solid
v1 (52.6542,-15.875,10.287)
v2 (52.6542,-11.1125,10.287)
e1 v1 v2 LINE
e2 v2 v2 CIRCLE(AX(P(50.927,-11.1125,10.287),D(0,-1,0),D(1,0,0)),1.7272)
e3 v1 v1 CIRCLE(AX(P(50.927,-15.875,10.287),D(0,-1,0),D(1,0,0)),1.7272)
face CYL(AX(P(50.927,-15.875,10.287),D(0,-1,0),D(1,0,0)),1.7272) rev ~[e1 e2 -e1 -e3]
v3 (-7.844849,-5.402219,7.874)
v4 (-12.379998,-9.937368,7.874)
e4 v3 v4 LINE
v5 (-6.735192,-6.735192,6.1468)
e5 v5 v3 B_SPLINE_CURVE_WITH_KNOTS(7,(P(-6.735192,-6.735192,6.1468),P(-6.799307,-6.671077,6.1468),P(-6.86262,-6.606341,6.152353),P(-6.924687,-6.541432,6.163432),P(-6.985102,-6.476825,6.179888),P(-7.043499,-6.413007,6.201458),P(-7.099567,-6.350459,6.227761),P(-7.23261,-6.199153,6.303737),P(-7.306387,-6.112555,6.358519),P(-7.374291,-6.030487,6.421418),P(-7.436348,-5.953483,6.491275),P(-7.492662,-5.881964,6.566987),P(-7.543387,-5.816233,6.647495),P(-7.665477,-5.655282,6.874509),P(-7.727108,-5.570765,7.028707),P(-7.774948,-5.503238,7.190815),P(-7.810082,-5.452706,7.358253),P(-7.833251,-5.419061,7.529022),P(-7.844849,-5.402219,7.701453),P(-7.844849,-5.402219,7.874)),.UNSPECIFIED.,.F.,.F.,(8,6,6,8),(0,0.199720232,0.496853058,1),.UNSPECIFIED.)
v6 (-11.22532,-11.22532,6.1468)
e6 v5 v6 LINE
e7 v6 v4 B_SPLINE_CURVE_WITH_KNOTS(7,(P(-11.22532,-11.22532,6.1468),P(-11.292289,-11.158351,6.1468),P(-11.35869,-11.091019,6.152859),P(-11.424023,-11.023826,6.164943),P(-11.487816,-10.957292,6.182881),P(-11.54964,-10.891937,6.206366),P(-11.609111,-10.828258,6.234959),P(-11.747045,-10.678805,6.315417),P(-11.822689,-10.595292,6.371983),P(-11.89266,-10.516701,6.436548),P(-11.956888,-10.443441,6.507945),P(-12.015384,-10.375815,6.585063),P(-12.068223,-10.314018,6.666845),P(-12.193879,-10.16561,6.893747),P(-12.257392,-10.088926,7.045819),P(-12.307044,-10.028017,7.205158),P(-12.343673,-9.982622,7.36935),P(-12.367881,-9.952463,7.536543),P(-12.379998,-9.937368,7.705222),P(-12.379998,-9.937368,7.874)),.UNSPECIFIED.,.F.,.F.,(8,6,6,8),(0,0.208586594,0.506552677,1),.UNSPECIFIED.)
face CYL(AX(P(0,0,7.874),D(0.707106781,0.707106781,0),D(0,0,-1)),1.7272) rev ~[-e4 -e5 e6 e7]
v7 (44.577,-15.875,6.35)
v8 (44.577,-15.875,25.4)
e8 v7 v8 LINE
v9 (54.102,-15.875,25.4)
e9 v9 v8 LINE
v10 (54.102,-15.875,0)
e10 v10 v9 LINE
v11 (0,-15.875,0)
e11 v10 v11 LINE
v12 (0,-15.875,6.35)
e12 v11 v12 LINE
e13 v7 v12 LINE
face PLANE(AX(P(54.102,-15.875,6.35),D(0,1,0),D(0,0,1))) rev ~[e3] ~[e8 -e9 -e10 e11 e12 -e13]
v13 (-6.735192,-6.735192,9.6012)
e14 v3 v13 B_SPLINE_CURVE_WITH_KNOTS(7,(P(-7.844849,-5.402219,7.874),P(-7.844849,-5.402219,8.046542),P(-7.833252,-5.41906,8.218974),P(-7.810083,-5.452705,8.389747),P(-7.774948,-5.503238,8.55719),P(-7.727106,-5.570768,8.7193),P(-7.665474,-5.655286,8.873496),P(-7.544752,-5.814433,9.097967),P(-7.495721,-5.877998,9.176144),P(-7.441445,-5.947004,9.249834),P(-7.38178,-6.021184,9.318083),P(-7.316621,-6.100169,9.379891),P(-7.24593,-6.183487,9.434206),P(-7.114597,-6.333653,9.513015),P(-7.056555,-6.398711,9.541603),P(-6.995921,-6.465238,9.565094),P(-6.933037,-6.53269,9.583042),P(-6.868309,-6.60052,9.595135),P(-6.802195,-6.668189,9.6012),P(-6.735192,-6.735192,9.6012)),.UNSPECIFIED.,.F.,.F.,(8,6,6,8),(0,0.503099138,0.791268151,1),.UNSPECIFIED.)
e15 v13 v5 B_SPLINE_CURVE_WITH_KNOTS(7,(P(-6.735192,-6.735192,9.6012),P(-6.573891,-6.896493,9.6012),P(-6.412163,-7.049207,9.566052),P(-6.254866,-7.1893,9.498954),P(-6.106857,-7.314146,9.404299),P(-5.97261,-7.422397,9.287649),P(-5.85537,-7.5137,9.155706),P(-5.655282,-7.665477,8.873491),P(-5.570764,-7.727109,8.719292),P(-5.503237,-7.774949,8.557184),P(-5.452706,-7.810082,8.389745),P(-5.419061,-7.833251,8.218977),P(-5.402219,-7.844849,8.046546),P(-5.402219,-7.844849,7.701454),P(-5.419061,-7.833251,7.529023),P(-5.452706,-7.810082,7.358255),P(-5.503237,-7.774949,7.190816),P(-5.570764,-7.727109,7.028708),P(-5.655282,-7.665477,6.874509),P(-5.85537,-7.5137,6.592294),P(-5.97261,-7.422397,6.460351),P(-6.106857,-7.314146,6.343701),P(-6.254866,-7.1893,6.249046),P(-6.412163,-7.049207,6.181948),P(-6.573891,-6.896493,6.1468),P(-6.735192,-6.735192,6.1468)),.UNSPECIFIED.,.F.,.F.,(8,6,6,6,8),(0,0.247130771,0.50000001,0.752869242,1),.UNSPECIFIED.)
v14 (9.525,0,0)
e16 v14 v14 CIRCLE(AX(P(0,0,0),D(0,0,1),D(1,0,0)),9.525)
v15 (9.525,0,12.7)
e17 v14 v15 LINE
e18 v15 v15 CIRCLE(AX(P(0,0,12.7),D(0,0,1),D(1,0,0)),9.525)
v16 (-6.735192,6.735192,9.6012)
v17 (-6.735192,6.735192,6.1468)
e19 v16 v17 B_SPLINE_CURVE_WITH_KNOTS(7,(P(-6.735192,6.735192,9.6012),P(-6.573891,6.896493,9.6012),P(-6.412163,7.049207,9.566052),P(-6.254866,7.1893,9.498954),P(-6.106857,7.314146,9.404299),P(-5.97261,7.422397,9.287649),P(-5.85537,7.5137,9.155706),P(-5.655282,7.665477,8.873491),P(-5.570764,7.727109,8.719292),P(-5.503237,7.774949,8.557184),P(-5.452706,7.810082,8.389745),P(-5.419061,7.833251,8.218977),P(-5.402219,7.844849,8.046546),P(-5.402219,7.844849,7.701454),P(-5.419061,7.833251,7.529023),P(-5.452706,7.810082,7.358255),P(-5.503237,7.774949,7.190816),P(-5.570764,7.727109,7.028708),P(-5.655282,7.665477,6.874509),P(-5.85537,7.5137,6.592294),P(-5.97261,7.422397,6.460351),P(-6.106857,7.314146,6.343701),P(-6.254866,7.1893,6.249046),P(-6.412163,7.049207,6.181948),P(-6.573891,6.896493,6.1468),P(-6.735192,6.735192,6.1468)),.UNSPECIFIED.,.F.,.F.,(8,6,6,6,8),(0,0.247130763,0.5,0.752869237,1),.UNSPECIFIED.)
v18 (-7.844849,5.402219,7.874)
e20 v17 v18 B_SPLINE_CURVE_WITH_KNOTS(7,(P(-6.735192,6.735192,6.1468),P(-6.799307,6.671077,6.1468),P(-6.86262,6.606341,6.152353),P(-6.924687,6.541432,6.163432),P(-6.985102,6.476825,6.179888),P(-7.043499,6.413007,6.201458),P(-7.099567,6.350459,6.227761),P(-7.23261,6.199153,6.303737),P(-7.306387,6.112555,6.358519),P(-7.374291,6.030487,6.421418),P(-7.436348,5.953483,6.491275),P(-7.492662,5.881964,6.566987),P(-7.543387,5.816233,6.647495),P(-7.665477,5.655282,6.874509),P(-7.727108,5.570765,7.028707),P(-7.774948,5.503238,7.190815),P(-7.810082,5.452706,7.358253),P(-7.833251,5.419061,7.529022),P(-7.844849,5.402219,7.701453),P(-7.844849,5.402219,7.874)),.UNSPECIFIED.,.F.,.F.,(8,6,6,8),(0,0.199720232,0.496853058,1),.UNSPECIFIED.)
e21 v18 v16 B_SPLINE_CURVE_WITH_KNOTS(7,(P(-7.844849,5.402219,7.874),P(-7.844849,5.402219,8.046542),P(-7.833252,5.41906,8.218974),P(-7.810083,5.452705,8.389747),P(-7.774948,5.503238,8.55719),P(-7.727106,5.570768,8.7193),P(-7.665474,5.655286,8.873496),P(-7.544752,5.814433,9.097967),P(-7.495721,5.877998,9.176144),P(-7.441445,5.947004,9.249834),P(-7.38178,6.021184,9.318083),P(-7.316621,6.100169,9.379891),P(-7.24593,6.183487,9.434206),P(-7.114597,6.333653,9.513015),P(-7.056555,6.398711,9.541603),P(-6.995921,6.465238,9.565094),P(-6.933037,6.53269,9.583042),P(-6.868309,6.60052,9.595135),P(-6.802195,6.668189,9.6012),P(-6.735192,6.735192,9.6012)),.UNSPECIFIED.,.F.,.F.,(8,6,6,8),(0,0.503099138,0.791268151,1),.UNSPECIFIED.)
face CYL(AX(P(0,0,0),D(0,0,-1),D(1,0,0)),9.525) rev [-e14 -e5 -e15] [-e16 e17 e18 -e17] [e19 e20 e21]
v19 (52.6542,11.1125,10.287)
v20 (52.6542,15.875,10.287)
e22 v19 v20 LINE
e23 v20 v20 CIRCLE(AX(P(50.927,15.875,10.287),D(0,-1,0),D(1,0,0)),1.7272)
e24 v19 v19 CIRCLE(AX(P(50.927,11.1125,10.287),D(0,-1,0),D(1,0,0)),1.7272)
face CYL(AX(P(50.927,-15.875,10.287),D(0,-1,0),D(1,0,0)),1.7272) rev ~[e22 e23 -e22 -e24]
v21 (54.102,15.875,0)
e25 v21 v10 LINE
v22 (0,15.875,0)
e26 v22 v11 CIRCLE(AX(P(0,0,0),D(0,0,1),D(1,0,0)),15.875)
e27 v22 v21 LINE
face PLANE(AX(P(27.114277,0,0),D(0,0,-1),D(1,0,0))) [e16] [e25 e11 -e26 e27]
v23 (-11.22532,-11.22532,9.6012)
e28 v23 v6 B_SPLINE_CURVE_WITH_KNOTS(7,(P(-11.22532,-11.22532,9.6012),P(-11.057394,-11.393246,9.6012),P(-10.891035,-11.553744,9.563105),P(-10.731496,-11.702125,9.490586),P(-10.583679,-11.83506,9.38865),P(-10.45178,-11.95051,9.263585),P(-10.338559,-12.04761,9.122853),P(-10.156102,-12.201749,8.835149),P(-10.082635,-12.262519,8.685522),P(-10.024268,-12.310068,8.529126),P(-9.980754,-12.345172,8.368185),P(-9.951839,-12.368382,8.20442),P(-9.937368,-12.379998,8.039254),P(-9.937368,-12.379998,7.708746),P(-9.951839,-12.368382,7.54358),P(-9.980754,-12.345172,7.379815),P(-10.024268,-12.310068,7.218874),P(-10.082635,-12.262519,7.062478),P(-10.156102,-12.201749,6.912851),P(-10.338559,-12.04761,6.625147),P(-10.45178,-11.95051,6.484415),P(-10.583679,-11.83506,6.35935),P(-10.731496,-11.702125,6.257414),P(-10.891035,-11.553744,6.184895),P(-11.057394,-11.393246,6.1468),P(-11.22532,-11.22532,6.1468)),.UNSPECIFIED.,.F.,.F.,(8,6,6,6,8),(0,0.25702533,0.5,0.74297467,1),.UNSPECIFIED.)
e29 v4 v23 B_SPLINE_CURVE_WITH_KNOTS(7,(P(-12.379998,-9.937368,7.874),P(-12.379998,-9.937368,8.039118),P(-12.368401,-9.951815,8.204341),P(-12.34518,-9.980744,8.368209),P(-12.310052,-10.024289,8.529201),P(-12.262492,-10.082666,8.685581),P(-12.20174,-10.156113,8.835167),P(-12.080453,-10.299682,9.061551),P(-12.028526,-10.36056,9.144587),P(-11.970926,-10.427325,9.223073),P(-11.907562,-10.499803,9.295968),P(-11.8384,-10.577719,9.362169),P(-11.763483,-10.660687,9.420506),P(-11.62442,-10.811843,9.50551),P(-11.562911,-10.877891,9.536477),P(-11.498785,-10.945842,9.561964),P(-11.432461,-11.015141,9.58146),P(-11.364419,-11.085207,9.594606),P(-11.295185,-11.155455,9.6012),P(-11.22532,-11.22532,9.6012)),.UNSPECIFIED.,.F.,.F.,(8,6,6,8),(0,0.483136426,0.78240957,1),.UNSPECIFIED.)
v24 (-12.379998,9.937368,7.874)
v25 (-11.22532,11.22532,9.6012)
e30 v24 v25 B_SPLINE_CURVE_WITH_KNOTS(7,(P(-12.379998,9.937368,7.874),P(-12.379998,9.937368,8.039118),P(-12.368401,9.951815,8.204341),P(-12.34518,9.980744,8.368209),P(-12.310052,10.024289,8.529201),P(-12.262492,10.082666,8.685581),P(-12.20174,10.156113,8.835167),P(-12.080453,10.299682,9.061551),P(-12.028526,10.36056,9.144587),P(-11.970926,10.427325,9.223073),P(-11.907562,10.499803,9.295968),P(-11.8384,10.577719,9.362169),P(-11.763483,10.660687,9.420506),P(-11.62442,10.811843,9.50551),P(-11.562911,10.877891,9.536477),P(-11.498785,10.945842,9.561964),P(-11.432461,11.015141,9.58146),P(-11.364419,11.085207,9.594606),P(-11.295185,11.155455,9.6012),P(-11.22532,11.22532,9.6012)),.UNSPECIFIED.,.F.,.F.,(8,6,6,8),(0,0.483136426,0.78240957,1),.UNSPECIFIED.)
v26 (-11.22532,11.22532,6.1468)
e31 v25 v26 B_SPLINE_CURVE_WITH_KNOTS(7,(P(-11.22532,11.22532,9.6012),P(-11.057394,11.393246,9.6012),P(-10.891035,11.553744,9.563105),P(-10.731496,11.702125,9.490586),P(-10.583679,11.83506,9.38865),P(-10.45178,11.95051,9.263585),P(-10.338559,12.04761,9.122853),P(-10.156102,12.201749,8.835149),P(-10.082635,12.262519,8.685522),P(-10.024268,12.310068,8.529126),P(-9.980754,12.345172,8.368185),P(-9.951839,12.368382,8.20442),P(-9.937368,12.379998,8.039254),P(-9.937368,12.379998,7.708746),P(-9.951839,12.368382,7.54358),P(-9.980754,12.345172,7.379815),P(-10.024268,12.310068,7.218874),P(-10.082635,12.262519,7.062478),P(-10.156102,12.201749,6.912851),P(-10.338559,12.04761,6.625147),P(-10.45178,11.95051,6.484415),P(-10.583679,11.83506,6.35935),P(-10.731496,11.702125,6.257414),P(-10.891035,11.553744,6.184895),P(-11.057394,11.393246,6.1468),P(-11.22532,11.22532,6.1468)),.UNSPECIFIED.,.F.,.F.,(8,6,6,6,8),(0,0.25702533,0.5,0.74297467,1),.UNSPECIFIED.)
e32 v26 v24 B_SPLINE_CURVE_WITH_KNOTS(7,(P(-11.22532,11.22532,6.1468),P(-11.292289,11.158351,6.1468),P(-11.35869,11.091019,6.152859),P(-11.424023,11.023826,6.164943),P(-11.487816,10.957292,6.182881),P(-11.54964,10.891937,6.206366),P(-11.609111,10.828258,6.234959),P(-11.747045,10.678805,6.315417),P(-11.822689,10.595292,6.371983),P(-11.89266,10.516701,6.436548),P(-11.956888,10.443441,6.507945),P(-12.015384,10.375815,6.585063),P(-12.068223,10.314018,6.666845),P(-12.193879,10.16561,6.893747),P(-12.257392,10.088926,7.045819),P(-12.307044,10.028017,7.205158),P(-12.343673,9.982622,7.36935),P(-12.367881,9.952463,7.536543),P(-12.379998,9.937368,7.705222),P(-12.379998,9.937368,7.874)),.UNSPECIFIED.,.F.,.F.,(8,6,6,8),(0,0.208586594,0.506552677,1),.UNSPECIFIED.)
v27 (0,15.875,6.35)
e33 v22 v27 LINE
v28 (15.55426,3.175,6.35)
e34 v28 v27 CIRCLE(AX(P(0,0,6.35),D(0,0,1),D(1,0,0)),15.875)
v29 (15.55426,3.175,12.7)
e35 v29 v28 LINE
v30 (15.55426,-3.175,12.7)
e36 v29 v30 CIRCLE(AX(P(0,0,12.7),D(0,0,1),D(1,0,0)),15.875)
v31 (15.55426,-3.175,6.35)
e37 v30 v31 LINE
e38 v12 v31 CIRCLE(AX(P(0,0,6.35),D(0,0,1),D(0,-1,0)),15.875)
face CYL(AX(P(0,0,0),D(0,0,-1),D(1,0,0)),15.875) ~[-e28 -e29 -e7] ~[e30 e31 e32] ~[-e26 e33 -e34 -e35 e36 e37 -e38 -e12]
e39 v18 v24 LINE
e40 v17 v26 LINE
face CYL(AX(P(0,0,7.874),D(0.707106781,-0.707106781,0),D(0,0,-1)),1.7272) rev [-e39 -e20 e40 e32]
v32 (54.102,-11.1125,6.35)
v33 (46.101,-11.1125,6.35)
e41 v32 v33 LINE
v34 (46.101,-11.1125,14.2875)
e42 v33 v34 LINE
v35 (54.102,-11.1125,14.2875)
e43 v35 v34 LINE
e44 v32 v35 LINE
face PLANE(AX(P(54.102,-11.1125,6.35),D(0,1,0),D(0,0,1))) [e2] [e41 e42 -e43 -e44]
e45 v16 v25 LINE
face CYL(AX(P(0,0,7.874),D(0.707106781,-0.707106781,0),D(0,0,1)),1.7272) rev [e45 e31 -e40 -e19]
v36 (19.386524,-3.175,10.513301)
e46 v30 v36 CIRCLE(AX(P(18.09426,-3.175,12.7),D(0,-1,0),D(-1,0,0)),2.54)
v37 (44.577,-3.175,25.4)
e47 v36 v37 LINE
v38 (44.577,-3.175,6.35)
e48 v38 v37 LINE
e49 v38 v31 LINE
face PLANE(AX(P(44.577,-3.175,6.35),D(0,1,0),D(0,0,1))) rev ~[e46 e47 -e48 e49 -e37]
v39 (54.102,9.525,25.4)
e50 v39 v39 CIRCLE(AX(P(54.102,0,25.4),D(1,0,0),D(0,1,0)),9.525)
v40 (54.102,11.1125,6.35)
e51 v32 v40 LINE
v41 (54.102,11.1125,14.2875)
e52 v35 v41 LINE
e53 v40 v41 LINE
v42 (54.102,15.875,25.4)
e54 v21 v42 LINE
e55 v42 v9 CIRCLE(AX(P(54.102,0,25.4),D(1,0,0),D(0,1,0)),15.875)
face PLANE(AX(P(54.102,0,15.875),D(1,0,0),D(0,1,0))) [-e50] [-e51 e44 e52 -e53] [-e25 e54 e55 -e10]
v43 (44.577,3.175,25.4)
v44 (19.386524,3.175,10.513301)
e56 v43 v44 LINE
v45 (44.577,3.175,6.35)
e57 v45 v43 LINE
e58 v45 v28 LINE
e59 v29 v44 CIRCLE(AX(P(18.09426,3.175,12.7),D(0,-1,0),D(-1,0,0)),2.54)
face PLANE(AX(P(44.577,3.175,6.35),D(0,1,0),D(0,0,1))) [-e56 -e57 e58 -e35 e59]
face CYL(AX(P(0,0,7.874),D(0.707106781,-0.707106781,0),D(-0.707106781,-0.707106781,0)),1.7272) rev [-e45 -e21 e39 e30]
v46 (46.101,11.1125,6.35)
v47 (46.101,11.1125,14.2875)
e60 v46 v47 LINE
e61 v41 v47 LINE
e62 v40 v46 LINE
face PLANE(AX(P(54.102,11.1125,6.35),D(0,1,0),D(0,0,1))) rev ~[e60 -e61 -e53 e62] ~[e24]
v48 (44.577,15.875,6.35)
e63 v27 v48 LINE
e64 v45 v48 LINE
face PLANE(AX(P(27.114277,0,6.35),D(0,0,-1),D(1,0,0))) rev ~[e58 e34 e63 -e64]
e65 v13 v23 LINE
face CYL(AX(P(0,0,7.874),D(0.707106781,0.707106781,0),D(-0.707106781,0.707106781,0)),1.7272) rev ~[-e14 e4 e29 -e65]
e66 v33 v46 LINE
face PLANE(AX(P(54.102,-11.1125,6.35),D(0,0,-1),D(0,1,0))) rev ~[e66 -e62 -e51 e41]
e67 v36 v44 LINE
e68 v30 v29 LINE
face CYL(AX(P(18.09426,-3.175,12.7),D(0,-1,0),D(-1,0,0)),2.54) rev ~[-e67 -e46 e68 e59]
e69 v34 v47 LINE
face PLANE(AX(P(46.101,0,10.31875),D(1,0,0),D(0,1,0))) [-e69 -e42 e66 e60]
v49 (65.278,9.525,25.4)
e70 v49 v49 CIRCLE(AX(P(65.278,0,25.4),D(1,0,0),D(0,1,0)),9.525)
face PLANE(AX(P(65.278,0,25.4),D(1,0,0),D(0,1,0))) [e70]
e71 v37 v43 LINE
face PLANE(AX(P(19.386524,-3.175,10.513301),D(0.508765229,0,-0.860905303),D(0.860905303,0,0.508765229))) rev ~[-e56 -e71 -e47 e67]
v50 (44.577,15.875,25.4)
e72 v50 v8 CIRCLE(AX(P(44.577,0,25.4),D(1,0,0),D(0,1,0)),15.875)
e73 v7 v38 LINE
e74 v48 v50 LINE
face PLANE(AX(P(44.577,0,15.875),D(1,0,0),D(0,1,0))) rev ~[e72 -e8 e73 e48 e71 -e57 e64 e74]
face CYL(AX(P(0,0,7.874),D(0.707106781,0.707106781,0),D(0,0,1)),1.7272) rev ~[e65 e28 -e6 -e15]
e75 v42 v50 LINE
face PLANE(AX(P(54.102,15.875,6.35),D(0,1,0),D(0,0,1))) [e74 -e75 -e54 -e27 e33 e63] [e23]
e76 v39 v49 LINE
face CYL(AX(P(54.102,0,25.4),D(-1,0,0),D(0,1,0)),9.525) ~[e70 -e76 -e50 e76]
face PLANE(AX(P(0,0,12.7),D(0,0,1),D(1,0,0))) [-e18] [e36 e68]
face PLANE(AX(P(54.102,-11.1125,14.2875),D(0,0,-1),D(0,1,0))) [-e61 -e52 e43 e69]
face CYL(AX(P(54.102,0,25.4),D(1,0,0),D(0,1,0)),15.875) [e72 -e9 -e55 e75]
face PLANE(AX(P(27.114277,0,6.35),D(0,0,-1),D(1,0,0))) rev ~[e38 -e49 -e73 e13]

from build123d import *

# Parameters (mm, degrees)
F0_R           = 15.875
F0_R_2         = 9.525
F1_DEPTH       = 12.7
F5_DEPTH       = 25.4
F7_DEPTH       = 25.4
F9_DEPTH       = 6.35
F11_W          = 31.75
F11_H          = 19.05
F12_DEPTH      = 9.525
F14_END_RADIUS = 15.875
F13_W          = 3.175
F13_H          = 19.05
F14_REACH      = 79.7657711337
F16_DEPTH      = 25.4
F17_R          = 9.525
F18_DEPTH      = 11.176
F19_W          = 22.225
F19_H          = 7.9375
F20_DEPTH      = 8.001
F21_R          = 1.7272
F22_DEPTH      = 101.6


with BuildPart() as f1:
    # F0 (on Top) → F1 (new body)
    with BuildSketch(Plane.XY):
        Circle(F0_R)
        Circle(F0_R_2, mode=Mode.SUBTRACT)
    extrude(amount=F1_DEPTH)

    # F4 (on face) → F5 (cut)
    with BuildSketch(Plane(origin=(0, 0, 0), x_dir=(-0.7071067812, 0.7071067812, 0), z_dir=(0.7071067812, 0.7071067812, 0))):
        with BuildLine():
            ThreePointArc((0, 6.1468), (1.2213148325, 6.6526851675), (1.7272, 7.874))
            ThreePointArc((1.7272, 7.874), (1.2213148325, 9.0953148325), (0, 9.6012))
            Line((0, 9.6012), (0, 6.1468))
        make_face()
        with BuildLine():
            Line((0, 6.1468), (0, 9.6012))
            ThreePointArc((0, 9.6012), (-1.7272, 7.874), (0, 6.1468))
        make_face()
    extrude(amount=-F5_DEPTH, mode=Mode.SUBTRACT)

    # F6 (on face) → F7 (cut)
    with BuildSketch(Plane(origin=(0, 0, 0), x_dir=(-0.7071067812, -0.7071067812, 0), z_dir=(-0.7071067812, 0.7071067812, 0))):
        with BuildLine():
            ThreePointArc((0, 6.1468), (1.2213148325, 6.6526851675), (1.7272, 7.874))
            ThreePointArc((1.7272, 7.874), (1.2213148325, 9.0953148325), (0, 9.6012))
            Line((0, 9.6012), (0, 6.1468))
        make_face()
        with BuildLine():
            Line((0, 6.1468), (0, 9.6012))
            ThreePointArc((0, 9.6012), (-1.7272, 7.874), (0, 6.1468))
        make_face()
    extrude(amount=F7_DEPTH, mode=Mode.SUBTRACT)

    # F8 (on face) → F9 (join)
    with BuildSketch(Plane(origin=(0, 0, 0), x_dir=(1, 0, 0), z_dir=(0, 0, -1))):
        with BuildLine():
            Line((54.102, 15.875), (0, 15.875))
            ThreePointArc((0, 15.875), (11.2253201513, 11.2253201513), (15.875, 0))
            ThreePointArc((15.875, 0), (11.2253201513, -11.2253201513), (0, -15.875))
            Line((0, -15.875), (54.102, -15.875))
            Line((54.102, -15.875), (54.102, 15.875))
        make_face()
    extrude(amount=-F9_DEPTH)

    # F11 (on offset) → F12 (join)
    with BuildSketch(Plane.YZ.offset(54.102)):
        with Locations((0, 15.875)):
            Rectangle(F11_W, F11_H)
        with BuildLine():
            ThreePointArc((15.875, 25.4), (0, 41.275), (-15.875, 25.4))
            Line((-15.875, 25.4), (15.875, 25.4))
        make_face()
    extrude(amount=-F12_DEPTH)

    f14_end = (Plane(origin=(0, 0, 6.35), x_dir=(-1, 0, 0), z_dir=(0, 0, -1)) * Cylinder(F14_END_RADIUS, 333.9846154871, mode=Mode.PRIVATE)).faces().sort_by_distance((-15.875, 0, 6.35))[0]
    # F13 (on face) → F14 (join, up to the whole of a round face its end follows)
    with BuildSketch(Plane(origin=(44.577, 0, 0), x_dir=(0, -1, 0), z_dir=(-1, 0, 0))):
        with Locations((-1.5875, 15.875)):
            Rectangle(F13_W, F13_H)
        with Locations((1.5875, 15.875)):
            Rectangle(F13_W, F13_H)
    f14_long = extrude(amount=F14_REACH, mode=Mode.PRIVATE)
    add(split(f14_long, bisect_by=f14_end, keep=Keep.ALL, mode=Mode.PRIVATE).solids().sort_by_distance((44.577, 0, 15.875))[0])

    # F15 (on face) → F16 (cut)
    with BuildSketch(Plane.XZ.offset(3.175)):
        with BuildLine():
            Line((19.3865235489, 10.5133005292), (44.577, 25.4))
            Line((44.577, 25.4), (15.5542598667, 25.4))
            Line((15.5542598667, 25.4), (15.5542598667, 12.7))
            ThreePointArc((15.5542598667, 12.7), (16.8354409267, 10.4938778646), (19.3865235489, 10.5133005292))
        make_face()
    extrude(amount=-F16_DEPTH, mode=Mode.SUBTRACT)

    # F17 (on face) → F18 (join)
    with BuildSketch(Plane.YZ.offset(54.102)):
        with Locations((0, 25.4)):
            Circle(F17_R)
    extrude(amount=F18_DEPTH)

    # F19 (on face) → F20 (cut)
    with BuildSketch(Plane.YZ.offset(54.102)):
        with Locations((0, 10.31875)):
            Rectangle(F19_W, F19_H)
    extrude(amount=-F20_DEPTH, mode=Mode.SUBTRACT)

    # F21 (on face) → F22 (cut)
    with BuildSketch(Plane.XZ.offset(15.875)):
        with Locations((50.927, 10.287)):
            Circle(F21_R)
    extrude(amount=-F22_DEPTH, mode=Mode.SUBTRACT)


solid = f1.part
